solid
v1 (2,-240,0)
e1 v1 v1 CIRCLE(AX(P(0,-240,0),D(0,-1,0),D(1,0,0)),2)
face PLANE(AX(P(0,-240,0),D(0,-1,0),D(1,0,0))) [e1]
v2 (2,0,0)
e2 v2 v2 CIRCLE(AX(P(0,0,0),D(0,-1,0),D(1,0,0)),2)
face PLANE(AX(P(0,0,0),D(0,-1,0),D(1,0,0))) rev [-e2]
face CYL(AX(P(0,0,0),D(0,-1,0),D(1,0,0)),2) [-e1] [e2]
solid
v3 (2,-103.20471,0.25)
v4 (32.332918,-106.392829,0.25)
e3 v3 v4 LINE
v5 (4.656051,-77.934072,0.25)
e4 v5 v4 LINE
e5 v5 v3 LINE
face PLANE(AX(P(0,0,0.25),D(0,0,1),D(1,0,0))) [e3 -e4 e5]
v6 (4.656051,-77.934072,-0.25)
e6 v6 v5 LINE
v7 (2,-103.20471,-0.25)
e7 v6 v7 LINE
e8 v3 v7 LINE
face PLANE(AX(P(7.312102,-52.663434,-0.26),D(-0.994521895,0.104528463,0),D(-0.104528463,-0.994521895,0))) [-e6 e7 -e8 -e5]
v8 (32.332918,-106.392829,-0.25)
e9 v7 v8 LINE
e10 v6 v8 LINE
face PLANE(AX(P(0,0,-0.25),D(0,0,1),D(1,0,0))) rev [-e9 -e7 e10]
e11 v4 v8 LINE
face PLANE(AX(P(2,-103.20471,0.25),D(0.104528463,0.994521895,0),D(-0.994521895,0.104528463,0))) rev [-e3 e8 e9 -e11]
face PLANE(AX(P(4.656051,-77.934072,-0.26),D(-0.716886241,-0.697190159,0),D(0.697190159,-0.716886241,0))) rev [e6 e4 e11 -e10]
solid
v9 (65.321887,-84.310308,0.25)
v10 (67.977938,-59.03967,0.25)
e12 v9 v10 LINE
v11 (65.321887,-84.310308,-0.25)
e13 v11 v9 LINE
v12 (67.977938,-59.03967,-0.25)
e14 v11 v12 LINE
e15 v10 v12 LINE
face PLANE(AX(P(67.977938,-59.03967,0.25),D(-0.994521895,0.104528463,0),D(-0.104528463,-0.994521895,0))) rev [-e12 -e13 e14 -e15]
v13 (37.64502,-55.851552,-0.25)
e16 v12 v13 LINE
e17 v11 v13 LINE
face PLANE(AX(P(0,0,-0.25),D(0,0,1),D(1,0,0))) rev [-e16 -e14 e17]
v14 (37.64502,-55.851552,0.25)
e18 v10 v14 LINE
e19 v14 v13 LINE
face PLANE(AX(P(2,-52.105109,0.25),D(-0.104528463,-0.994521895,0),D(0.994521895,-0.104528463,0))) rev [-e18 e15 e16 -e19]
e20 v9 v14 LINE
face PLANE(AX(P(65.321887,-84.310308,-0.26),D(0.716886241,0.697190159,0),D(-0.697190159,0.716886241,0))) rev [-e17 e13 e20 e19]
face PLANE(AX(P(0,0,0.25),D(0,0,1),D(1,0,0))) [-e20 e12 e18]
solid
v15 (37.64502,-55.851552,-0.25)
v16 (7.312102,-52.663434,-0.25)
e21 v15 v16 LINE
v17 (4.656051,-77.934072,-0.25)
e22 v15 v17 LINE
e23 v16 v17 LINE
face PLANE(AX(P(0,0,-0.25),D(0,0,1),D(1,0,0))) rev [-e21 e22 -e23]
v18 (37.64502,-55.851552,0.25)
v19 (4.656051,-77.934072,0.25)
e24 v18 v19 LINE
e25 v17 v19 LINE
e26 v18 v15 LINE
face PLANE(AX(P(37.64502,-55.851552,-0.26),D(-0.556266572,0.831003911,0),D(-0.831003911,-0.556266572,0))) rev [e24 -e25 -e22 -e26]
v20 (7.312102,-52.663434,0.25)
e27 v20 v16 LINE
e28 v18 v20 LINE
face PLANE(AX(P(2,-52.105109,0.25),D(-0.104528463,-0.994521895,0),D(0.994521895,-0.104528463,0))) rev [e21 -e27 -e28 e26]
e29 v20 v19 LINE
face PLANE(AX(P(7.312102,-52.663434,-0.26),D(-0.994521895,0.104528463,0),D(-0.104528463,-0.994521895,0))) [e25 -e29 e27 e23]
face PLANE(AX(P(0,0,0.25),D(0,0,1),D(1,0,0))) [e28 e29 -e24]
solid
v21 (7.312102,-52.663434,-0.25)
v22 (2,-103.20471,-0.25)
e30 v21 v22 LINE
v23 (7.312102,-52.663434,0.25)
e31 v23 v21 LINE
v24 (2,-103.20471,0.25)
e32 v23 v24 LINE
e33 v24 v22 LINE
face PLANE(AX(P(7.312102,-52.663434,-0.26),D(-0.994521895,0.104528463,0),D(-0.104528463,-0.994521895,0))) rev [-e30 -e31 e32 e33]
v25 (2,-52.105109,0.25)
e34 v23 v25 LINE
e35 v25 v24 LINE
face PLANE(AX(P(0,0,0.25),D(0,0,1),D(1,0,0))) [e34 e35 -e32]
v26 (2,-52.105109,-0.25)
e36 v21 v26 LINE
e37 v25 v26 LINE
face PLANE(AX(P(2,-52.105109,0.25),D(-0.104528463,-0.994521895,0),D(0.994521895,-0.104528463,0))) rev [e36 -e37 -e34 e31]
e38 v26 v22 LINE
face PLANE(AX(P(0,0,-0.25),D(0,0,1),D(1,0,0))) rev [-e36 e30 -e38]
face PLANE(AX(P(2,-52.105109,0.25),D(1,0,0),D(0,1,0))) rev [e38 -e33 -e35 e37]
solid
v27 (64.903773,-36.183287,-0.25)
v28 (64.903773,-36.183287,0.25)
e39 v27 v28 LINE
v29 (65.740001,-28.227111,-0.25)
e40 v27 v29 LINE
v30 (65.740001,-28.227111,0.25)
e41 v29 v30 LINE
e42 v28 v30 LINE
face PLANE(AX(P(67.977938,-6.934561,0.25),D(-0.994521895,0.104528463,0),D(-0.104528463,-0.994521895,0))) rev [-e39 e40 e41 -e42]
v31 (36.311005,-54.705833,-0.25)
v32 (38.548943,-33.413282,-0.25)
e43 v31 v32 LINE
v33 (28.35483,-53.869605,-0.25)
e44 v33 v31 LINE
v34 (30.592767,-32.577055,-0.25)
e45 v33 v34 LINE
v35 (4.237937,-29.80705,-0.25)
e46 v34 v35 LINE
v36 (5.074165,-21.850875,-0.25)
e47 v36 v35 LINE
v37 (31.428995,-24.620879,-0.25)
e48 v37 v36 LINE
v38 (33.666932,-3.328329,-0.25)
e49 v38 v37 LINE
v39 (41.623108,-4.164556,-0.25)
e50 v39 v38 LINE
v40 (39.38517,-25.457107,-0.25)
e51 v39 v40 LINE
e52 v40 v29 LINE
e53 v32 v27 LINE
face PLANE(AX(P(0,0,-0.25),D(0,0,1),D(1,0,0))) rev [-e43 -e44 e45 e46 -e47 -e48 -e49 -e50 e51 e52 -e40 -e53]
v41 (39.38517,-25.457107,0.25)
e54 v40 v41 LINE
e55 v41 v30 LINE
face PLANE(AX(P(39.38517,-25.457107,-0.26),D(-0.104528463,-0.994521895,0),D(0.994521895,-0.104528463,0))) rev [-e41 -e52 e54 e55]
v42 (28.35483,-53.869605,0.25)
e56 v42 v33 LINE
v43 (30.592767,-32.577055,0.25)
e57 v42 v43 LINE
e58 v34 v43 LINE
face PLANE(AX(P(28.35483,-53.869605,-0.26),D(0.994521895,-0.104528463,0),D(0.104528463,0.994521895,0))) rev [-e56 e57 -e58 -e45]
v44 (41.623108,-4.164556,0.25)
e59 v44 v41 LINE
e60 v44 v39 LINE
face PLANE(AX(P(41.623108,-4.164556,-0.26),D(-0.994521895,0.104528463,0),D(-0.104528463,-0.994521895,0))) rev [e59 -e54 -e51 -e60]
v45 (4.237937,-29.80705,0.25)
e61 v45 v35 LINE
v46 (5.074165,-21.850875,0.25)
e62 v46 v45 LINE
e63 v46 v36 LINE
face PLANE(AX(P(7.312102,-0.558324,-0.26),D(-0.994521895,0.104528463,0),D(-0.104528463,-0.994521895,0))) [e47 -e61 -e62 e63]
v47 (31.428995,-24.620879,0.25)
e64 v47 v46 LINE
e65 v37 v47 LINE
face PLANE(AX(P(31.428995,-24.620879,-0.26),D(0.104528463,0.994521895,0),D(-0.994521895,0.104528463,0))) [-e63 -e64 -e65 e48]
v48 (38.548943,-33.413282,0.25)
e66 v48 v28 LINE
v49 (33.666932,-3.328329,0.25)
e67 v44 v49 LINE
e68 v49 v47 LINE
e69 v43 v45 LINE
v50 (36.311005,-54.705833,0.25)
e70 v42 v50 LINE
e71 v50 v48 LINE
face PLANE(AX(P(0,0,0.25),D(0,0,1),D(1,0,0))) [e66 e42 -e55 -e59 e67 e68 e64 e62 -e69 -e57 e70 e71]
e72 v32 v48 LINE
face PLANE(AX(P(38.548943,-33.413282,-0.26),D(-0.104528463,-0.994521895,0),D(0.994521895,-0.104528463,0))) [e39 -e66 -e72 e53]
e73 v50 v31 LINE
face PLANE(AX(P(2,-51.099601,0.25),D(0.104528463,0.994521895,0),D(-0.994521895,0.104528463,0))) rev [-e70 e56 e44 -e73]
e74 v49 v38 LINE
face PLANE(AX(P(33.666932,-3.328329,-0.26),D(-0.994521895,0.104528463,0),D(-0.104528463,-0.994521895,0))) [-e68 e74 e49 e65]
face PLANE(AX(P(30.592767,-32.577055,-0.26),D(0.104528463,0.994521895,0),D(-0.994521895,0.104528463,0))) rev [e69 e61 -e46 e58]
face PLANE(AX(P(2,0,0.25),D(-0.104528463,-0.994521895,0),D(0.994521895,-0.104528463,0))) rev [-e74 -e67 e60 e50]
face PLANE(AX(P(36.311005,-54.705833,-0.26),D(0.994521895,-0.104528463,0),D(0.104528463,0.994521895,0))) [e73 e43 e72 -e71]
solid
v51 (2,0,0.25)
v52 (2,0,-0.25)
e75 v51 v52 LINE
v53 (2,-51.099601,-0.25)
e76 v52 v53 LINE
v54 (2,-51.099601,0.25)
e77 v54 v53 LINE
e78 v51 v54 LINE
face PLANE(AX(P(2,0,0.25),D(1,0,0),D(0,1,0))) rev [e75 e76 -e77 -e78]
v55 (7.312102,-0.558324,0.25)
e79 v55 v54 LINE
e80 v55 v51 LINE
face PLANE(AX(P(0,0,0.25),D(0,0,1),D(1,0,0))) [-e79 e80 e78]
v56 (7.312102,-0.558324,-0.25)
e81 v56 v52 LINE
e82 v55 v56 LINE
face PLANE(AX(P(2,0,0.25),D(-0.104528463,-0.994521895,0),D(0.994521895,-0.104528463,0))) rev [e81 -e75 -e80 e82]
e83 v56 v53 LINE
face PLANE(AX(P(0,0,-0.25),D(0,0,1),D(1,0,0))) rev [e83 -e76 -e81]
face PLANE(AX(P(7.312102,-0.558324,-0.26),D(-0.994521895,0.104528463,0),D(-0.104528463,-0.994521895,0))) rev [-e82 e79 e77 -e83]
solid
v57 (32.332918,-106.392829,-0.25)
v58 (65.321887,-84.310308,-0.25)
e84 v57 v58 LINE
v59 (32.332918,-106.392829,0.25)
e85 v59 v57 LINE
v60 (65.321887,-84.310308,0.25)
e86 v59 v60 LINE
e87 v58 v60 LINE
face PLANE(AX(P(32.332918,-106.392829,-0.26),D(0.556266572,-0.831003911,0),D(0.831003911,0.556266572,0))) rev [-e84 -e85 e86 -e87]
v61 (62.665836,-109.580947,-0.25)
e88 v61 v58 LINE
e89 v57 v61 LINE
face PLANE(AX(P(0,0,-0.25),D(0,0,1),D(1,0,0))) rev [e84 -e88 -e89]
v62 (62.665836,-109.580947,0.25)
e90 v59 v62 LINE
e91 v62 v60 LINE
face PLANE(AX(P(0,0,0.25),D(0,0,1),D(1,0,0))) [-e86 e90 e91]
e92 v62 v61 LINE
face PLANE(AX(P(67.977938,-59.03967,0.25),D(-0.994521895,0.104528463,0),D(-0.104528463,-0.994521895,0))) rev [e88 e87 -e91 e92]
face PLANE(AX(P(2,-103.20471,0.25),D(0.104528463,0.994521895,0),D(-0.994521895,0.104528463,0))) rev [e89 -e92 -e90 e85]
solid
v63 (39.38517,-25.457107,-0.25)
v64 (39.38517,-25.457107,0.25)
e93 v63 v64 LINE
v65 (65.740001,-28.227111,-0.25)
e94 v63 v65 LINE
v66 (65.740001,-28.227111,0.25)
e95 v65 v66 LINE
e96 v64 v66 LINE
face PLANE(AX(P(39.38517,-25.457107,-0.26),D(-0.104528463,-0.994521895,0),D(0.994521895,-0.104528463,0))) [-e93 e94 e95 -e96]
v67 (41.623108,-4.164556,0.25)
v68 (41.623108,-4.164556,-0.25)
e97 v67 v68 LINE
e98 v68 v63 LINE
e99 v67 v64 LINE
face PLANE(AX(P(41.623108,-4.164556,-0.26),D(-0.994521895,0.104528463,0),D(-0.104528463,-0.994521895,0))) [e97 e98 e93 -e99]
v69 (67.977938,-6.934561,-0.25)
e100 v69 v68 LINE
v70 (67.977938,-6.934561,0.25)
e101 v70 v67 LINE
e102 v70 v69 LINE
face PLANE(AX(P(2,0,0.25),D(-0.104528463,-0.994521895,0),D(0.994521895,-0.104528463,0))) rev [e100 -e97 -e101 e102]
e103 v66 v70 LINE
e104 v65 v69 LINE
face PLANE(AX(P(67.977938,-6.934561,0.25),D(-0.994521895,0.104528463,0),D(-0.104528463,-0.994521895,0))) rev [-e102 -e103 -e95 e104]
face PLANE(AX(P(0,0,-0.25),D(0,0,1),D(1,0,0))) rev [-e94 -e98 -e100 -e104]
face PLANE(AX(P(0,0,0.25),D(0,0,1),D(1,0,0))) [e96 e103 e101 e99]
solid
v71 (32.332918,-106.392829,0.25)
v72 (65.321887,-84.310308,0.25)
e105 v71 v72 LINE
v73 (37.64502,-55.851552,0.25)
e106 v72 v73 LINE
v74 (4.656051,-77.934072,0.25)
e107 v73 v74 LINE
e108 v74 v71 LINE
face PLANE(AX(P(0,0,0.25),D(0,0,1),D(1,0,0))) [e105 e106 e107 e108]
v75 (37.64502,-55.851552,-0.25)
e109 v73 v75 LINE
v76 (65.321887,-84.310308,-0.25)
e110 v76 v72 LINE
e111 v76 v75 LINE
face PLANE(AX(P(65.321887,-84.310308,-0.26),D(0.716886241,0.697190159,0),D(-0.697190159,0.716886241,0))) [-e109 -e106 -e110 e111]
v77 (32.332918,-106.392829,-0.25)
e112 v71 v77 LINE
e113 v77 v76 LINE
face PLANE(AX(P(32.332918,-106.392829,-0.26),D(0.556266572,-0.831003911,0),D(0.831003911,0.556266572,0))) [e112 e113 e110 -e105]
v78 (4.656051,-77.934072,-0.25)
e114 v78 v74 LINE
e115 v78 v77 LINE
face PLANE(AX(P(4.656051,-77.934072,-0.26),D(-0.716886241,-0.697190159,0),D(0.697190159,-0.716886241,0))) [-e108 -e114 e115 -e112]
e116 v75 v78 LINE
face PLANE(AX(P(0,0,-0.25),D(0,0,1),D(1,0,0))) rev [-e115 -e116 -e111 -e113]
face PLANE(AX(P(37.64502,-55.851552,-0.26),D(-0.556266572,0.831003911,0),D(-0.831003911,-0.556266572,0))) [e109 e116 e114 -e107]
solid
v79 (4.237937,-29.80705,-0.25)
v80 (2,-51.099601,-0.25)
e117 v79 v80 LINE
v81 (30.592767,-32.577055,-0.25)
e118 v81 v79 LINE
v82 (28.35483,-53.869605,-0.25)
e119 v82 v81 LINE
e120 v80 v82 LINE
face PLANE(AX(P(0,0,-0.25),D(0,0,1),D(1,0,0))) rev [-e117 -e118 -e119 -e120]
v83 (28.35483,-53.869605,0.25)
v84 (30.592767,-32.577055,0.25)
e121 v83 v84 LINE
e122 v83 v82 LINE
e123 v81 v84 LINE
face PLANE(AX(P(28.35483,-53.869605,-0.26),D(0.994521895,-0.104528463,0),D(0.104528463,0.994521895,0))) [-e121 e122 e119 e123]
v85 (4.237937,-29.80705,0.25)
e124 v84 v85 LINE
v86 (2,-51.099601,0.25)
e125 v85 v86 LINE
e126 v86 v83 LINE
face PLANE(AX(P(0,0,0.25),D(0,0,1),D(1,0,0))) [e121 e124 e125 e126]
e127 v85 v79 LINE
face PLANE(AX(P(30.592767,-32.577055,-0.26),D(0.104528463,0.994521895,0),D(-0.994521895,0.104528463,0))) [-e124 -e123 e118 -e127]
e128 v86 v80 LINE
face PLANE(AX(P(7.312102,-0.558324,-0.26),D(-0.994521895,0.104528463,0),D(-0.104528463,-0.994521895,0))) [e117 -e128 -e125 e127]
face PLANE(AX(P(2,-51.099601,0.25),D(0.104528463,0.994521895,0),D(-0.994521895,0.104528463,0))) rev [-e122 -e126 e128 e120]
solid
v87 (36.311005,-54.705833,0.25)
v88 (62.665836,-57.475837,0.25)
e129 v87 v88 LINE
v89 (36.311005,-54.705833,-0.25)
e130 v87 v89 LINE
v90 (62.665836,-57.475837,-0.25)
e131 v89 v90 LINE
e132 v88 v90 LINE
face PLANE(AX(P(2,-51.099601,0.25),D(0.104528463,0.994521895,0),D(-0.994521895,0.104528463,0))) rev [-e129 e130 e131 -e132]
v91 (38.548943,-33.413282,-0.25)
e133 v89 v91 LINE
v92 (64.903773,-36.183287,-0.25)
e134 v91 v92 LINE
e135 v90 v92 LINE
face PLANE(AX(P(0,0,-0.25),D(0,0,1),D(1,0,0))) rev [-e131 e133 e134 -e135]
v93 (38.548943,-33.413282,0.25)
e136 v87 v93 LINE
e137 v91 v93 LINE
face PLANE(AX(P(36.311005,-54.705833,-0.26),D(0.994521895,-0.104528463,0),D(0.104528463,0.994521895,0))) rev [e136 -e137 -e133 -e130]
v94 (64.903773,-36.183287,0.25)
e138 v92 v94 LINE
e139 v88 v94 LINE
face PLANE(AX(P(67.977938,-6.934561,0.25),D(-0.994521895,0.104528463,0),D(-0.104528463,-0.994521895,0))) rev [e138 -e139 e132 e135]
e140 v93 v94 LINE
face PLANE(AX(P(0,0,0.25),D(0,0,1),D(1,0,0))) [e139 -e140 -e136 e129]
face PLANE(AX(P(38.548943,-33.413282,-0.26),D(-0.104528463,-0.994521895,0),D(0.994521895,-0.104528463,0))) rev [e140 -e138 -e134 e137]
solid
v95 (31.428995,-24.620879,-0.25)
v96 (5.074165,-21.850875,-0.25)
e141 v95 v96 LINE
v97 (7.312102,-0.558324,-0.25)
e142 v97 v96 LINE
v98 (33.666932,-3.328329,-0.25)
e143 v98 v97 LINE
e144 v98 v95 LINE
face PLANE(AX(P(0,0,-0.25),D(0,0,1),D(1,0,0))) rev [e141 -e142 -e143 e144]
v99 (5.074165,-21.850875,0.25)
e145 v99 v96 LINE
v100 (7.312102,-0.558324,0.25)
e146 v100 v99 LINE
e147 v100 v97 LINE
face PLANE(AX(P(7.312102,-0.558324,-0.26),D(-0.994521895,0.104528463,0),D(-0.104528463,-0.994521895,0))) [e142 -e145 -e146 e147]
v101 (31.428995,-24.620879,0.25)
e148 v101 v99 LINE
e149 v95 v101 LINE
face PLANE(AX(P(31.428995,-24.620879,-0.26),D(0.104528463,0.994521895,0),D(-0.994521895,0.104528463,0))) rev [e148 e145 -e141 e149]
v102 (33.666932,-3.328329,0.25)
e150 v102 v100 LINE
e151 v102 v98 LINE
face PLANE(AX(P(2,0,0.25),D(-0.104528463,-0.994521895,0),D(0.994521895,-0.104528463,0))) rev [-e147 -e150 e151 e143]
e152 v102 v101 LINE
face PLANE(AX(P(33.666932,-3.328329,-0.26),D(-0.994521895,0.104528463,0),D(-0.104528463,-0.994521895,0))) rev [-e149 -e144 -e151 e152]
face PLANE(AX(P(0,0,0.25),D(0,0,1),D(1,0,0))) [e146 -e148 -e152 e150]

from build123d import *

# Parameters (mm, degrees)
BOSS_EXTRU_2_DEPTH             = 0.25
BOSS_EXTRU_2_2_DEPTH           = 0.25
FRACTIONNER1_START             = -0.25
FRACTIONNER1_DEPTH             = 0.5
FRACTIONNER1_2_DEPTH           = 0.5
FRACTIONNER1_START_2           = 7.435510802
FRACTIONNER1_3_OUTLINE_W       = 54
FRACTIONNER1_3_OUTLINE_H       = 4
FRACTIONNER1_3_DEPTH           = 5.341362776
FRACTIONNER1_START_3           = 1.989043791
FRACTIONNER1_4_OUTLINE_W       = 54
FRACTIONNER1_4_OUTLINE_H       = 4
FRACTIONNER1_4_DEPTH           = 5.341362776
FRACTIONNER2_SURFACE_1_1_BACK  = 128.911
FRACTIONNER2_SURFACE_1_1_DEPTH = 257.822
FRACTIONNER2_SURFACE_1_2_BACK  = 128.911
FRACTIONNER2_SURFACE_1_2_DEPTH = 257.822
FRACTIONNER2_SURFACE_2_3_BACK  = 128.911
FRACTIONNER2_SURFACE_2_3_DEPTH = 257.822
FRACTIONNER2_SURFACE_2_4_BACK  = 128.911
FRACTIONNER2_SURFACE_2_4_DEPTH = 257.822
FRACTIONNER2_SURFACE_3_5_BACK  = 128.911
FRACTIONNER2_SURFACE_3_5_DEPTH = 257.822
FRACTIONNER2_SURFACE_3_6_BACK  = 128.911
FRACTIONNER2_SURFACE_3_6_DEPTH = 257.822
FRACTIONNER2_SURFACE_4_7_BACK  = 128.911
FRACTIONNER2_SURFACE_4_7_DEPTH = 257.822
FRACTIONNER2_SURFACE_4_8_BACK  = 128.911
FRACTIONNER2_SURFACE_4_8_DEPTH = 257.822
FRACTIONNER3_SURFACE_9_BACK    = 128.911
FRACTIONNER3_SURFACE_9_DEPTH   = 257.822
FRACTIONNER3_SURFACE_10_BACK   = 128.911
FRACTIONNER3_SURFACE_10_DEPTH  = 257.822
BALAYAGE2_PROFILE_R            = 2


# Read off the part's stored shape, not the designer's step: Fractionner1
with BuildPart() as part:
    # Esquisse2 → Boss.-Extru.2 (new, symmetric)
    with BuildSketch(Plane.XY):
        Polygon((2, 0), (67.977937849, -6.934560702), (62.665835617, -57.475837352), (2, -51.099601093), align=None)
    extrude(amount=BOSS_EXTRU_2_DEPTH, both=True)

    # Fractionner1 4 outline → Fractionner1 4 (cut)
    with BuildSketch(Plane(origin=(0, 0, 0), x_dir=(0.10452846326764997, 0.9945218953682736, 0), z_dir=(0.9945218953682737, -0.10452846326764997, 0)).offset(FRACTIONNER1_START_3)):
        with Locations((-25, 0)):
            Rectangle(FRACTIONNER1_4_OUTLINE_W, FRACTIONNER1_4_OUTLINE_H)
    extrude(amount=FRACTIONNER1_4_DEPTH, mode=Mode.SUBTRACT)


with BuildPart() as body_2:
    # Esquisse2 → Boss.-Extru.2 2 (new, symmetric)
    with BuildSketch(Plane.XY):
        Polygon((2, -52.105109372), (67.977937849, -59.039670074), (62.665835617, -109.580946724), (2, -103.204710465), align=None)
    extrude(amount=BOSS_EXTRU_2_2_DEPTH, both=True)

    # Fractionner1 3 outline → Fractionner1 3 (cut)
    with BuildSketch(Plane(origin=(0, 0, 0), x_dir=(0.10452846326764997, 0.9945218953682736, 0), z_dir=(0.9945218953682737, -0.10452846326764997, 0)).offset(FRACTIONNER1_START_2)):
        with Locations((-77, 0)):
            Rectangle(FRACTIONNER1_3_OUTLINE_W, FRACTIONNER1_3_OUTLINE_H)
    extrude(amount=FRACTIONNER1_3_DEPTH, mode=Mode.SUBTRACT)


with BuildPart() as body_3:
    # Fractionner1 outline → Fractionner1 (new body)
    with BuildSketch(Plane.XY.offset(FRACTIONNER1_START)):
        Polygon((2, -51.099601093), (7.312102232, -0.558324443), (2, 0), align=None)
    extrude(amount=FRACTIONNER1_DEPTH)


with BuildPart() as body_4:
    # Fractionner1 2 outline → Fractionner1 2 (new body)
    with BuildSketch(Plane.XY.offset(FRACTIONNER1_START)):
        Polygon((2, -103.204710465), (7.312102232, -52.663433815), (2, -52.105109372), align=None)
    extrude(amount=FRACTIONNER1_2_DEPTH)


with BuildPart() as body_5:
    # Fractionner2: the piece behind the surface
    add(part.part)
    # Fractionner2 surface 1: a surface, the sketch's curves swept straight by 257.822 mm
    with BuildLine(Plane.XY.offset(0.25).offset(-FRACTIONNER2_SURFACE_1_1_BACK), mode=Mode.PRIVATE) as fractionner2_surface_1_1_path:
        Line((5.074164969, -21.850875186), (31.428995196, -24.620879463))
        Line((31.428995196, -24.620879463), (33.666932459, -3.328328719))
    fractionner2_surface_1_1 = Shell.extrude(fractionner2_surface_1_1_path.wire(), (0 * FRACTIONNER2_SURFACE_1_1_DEPTH, 0 * FRACTIONNER2_SURFACE_1_1_DEPTH, 1 * FRACTIONNER2_SURFACE_1_1_DEPTH))
    split(bisect_by=fractionner2_surface_1_1, keep=Keep.BOTTOM)


with BuildPart() as part_1:
    add(part.part)

    # Fractionner2: split by a surface, the side it looks to stays
    # Fractionner2 surface 1: a surface, the sketch's curves swept straight by 257.822 mm
    with BuildLine(Plane.XY.offset(0.25).offset(-FRACTIONNER2_SURFACE_1_2_BACK), mode=Mode.PRIVATE) as fractionner2_surface_1_2_path:
        Line((5.074164969, -21.850875186), (31.428995196, -24.620879463))
        Line((31.428995196, -24.620879463), (33.666932459, -3.328328719))
    fractionner2_surface_1_2 = Shell.extrude(fractionner2_surface_1_2_path.wire(), (0 * FRACTIONNER2_SURFACE_1_2_DEPTH, 0 * FRACTIONNER2_SURFACE_1_2_DEPTH, 1 * FRACTIONNER2_SURFACE_1_2_DEPTH))
    split(bisect_by=fractionner2_surface_1_2, keep=Keep.TOP)


with BuildPart() as body_6:
    # Fractionner2 2 body 5: the piece behind the surface
    add(body_5.part)
    # Fractionner2 surface 2: a surface, the sketch's curves swept straight by 257.822 mm
    with BuildLine(Plane.XY.offset(0.25).offset(-FRACTIONNER2_SURFACE_2_3_BACK), mode=Mode.PRIVATE) as fractionner2_surface_2_3_path:
        Line((41.623107622, -4.164556425), (39.385170359, -25.457107169))
        Line((39.385170359, -25.457107169), (65.740000586, -28.227111445))
    fractionner2_surface_2_3 = Shell.extrude(fractionner2_surface_2_3_path.wire(), (0 * FRACTIONNER2_SURFACE_2_3_DEPTH, 0 * FRACTIONNER2_SURFACE_2_3_DEPTH, 1 * FRACTIONNER2_SURFACE_2_3_DEPTH))
    split(bisect_by=fractionner2_surface_2_3, keep=Keep.BOTTOM)


with BuildPart() as body_5_1:
    add(body_5.part)

    # Fractionner2 2 body 5: split by a surface, the side it looks to stays
    # Fractionner2 surface 2: a surface, the sketch's curves swept straight by 257.822 mm
    with BuildLine(Plane.XY.offset(0.25).offset(-FRACTIONNER2_SURFACE_2_4_BACK), mode=Mode.PRIVATE) as fractionner2_surface_2_4_path:
        Line((41.623107622, -4.164556425), (39.385170359, -25.457107169))
        Line((39.385170359, -25.457107169), (65.740000586, -28.227111445))
    fractionner2_surface_2_4 = Shell.extrude(fractionner2_surface_2_4_path.wire(), (0 * FRACTIONNER2_SURFACE_2_4_DEPTH, 0 * FRACTIONNER2_SURFACE_2_4_DEPTH, 1 * FRACTIONNER2_SURFACE_2_4_DEPTH))
    split(bisect_by=fractionner2_surface_2_4, keep=Keep.TOP)


with BuildPart() as body_7:
    # Fractionner2 3 body 6: the piece behind the surface
    add(body_6.part)
    # Fractionner2 surface 3: a surface, the sketch's curves swept straight by 257.822 mm
    with BuildLine(Plane.XY.offset(0.25).offset(-FRACTIONNER2_SURFACE_3_5_BACK), mode=Mode.PRIVATE) as fractionner2_surface_3_5_path:
        Line((64.90377288, -36.183286608), (38.548942653, -33.413282332))
        Line((38.548942653, -33.413282332), (36.31100539, -54.705833075))
    fractionner2_surface_3_5 = Shell.extrude(fractionner2_surface_3_5_path.wire(), (0 * FRACTIONNER2_SURFACE_3_5_DEPTH, 0 * FRACTIONNER2_SURFACE_3_5_DEPTH, 1 * FRACTIONNER2_SURFACE_3_5_DEPTH))
    split(bisect_by=fractionner2_surface_3_5, keep=Keep.BOTTOM)


with BuildPart() as body_6_1:
    add(body_6.part)

    # Fractionner2 3 body 6: split by a surface, the side it looks to stays
    # Fractionner2 surface 3: a surface, the sketch's curves swept straight by 257.822 mm
    with BuildLine(Plane.XY.offset(0.25).offset(-FRACTIONNER2_SURFACE_3_6_BACK), mode=Mode.PRIVATE) as fractionner2_surface_3_6_path:
        Line((64.90377288, -36.183286608), (38.548942653, -33.413282332))
        Line((38.548942653, -33.413282332), (36.31100539, -54.705833075))
    fractionner2_surface_3_6 = Shell.extrude(fractionner2_surface_3_6_path.wire(), (0 * FRACTIONNER2_SURFACE_3_6_DEPTH, 0 * FRACTIONNER2_SURFACE_3_6_DEPTH, 1 * FRACTIONNER2_SURFACE_3_6_DEPTH))
    split(bisect_by=fractionner2_surface_3_6, keep=Keep.TOP)


with BuildPart() as body_8:
    # Fractionner2 4 body 7: the piece behind the surface
    add(body_7.part)
    # Fractionner2 surface 4: a surface, the sketch's curves swept straight by 257.822 mm
    with BuildLine(Plane.XY.offset(0.25).offset(-FRACTIONNER2_SURFACE_4_7_BACK), mode=Mode.PRIVATE) as fractionner2_surface_4_7_path:
        Line((28.354830227, -53.869605369), (30.59276749, -32.577054626))
        Line((30.59276749, -32.577054626), (4.237937263, -29.807050349))
    fractionner2_surface_4_7 = Shell.extrude(fractionner2_surface_4_7_path.wire(), (0 * FRACTIONNER2_SURFACE_4_7_DEPTH, 0 * FRACTIONNER2_SURFACE_4_7_DEPTH, 1 * FRACTIONNER2_SURFACE_4_7_DEPTH))
    split(bisect_by=fractionner2_surface_4_7, keep=Keep.BOTTOM)


with BuildPart() as body_7_1:
    add(body_7.part)

    # Fractionner2 4 body 7: split by a surface, the side it looks to stays
    # Fractionner2 surface 4: a surface, the sketch's curves swept straight by 257.822 mm
    with BuildLine(Plane.XY.offset(0.25).offset(-FRACTIONNER2_SURFACE_4_8_BACK), mode=Mode.PRIVATE) as fractionner2_surface_4_8_path:
        Line((28.354830227, -53.869605369), (30.59276749, -32.577054626))
        Line((30.59276749, -32.577054626), (4.237937263, -29.807050349))
    fractionner2_surface_4_8 = Shell.extrude(fractionner2_surface_4_8_path.wire(), (0 * FRACTIONNER2_SURFACE_4_8_DEPTH, 0 * FRACTIONNER2_SURFACE_4_8_DEPTH, 1 * FRACTIONNER2_SURFACE_4_8_DEPTH))
    split(bisect_by=fractionner2_surface_4_8, keep=Keep.TOP)


with BuildPart() as body_9:
    # Fractionner3: the piece behind the surface
    add(body_2.part)
    # Fractionner3 surface: a surface, the sketch's curves swept straight by 257.822 mm
    with BuildLine(Plane.XY.offset(0.25).offset(-FRACTIONNER3_SURFACE_9_BACK), mode=Mode.PRIVATE) as fractionner3_surface_9_path:
        Line((37.64502004, -55.851551945), (4.656051116, -77.93407214))
        Line((4.656051116, -77.93407214), (32.332917809, -106.392828594))
        Line((32.332917809, -106.392828594), (65.321886733, -84.310308399))
        Line((65.321886733, -84.310308399), (37.64502004, -55.851551945))
    fractionner3_surface_9 = Shell.extrude(fractionner3_surface_9_path.wire(), (0 * FRACTIONNER3_SURFACE_9_DEPTH, 0 * FRACTIONNER3_SURFACE_9_DEPTH, 1 * FRACTIONNER3_SURFACE_9_DEPTH))
    split(bisect_by=fractionner3_surface_9, keep=Keep.BOTTOM)


with BuildPart() as body_2_1:
    add(body_2.part)

    # Fractionner3: split by a surface, the side it looks to stays
    # Fractionner3 surface: a surface, the sketch's curves swept straight by 257.822 mm
    with BuildLine(Plane.XY.offset(0.25).offset(-FRACTIONNER3_SURFACE_10_BACK), mode=Mode.PRIVATE) as fractionner3_surface_10_path:
        Line((37.64502004, -55.851551945), (4.656051116, -77.93407214))
        Line((4.656051116, -77.93407214), (32.332917809, -106.392828594))
        Line((32.332917809, -106.392828594), (65.321886733, -84.310308399))
        Line((65.321886733, -84.310308399), (37.64502004, -55.851551945))
    fractionner3_surface_10 = Shell.extrude(fractionner3_surface_10_path.wire(), (0 * FRACTIONNER3_SURFACE_10_DEPTH, 0 * FRACTIONNER3_SURFACE_10_DEPTH, 1 * FRACTIONNER3_SURFACE_10_DEPTH))
    split(bisect_by=fractionner3_surface_10, keep=Keep.TOP)


with BuildPart() as body_10:
    # Balayage2: sweep along a path in Esquisse7
    with BuildLine(Plane.XY) as balayage2_path:
        Line((0, 0), (0, -240))
    # Balayage2 profile (on start of the path) → Balayage2 (sweep)
    with BuildSketch(Plane(origin=(0, 0, 0), x_dir=(-1, 0, 0), z_dir=(0, -1, 0))):
        Circle(BALAYAGE2_PROFILE_R)
    sweep(path=balayage2_path.line)


solid = Compound([body_3.part, body_4.part, part_1.part, body_5_1.part, body_6_1.part, body_8.part, body_7_1.part, body_9.part, body_2_1.part, body_10.part])
